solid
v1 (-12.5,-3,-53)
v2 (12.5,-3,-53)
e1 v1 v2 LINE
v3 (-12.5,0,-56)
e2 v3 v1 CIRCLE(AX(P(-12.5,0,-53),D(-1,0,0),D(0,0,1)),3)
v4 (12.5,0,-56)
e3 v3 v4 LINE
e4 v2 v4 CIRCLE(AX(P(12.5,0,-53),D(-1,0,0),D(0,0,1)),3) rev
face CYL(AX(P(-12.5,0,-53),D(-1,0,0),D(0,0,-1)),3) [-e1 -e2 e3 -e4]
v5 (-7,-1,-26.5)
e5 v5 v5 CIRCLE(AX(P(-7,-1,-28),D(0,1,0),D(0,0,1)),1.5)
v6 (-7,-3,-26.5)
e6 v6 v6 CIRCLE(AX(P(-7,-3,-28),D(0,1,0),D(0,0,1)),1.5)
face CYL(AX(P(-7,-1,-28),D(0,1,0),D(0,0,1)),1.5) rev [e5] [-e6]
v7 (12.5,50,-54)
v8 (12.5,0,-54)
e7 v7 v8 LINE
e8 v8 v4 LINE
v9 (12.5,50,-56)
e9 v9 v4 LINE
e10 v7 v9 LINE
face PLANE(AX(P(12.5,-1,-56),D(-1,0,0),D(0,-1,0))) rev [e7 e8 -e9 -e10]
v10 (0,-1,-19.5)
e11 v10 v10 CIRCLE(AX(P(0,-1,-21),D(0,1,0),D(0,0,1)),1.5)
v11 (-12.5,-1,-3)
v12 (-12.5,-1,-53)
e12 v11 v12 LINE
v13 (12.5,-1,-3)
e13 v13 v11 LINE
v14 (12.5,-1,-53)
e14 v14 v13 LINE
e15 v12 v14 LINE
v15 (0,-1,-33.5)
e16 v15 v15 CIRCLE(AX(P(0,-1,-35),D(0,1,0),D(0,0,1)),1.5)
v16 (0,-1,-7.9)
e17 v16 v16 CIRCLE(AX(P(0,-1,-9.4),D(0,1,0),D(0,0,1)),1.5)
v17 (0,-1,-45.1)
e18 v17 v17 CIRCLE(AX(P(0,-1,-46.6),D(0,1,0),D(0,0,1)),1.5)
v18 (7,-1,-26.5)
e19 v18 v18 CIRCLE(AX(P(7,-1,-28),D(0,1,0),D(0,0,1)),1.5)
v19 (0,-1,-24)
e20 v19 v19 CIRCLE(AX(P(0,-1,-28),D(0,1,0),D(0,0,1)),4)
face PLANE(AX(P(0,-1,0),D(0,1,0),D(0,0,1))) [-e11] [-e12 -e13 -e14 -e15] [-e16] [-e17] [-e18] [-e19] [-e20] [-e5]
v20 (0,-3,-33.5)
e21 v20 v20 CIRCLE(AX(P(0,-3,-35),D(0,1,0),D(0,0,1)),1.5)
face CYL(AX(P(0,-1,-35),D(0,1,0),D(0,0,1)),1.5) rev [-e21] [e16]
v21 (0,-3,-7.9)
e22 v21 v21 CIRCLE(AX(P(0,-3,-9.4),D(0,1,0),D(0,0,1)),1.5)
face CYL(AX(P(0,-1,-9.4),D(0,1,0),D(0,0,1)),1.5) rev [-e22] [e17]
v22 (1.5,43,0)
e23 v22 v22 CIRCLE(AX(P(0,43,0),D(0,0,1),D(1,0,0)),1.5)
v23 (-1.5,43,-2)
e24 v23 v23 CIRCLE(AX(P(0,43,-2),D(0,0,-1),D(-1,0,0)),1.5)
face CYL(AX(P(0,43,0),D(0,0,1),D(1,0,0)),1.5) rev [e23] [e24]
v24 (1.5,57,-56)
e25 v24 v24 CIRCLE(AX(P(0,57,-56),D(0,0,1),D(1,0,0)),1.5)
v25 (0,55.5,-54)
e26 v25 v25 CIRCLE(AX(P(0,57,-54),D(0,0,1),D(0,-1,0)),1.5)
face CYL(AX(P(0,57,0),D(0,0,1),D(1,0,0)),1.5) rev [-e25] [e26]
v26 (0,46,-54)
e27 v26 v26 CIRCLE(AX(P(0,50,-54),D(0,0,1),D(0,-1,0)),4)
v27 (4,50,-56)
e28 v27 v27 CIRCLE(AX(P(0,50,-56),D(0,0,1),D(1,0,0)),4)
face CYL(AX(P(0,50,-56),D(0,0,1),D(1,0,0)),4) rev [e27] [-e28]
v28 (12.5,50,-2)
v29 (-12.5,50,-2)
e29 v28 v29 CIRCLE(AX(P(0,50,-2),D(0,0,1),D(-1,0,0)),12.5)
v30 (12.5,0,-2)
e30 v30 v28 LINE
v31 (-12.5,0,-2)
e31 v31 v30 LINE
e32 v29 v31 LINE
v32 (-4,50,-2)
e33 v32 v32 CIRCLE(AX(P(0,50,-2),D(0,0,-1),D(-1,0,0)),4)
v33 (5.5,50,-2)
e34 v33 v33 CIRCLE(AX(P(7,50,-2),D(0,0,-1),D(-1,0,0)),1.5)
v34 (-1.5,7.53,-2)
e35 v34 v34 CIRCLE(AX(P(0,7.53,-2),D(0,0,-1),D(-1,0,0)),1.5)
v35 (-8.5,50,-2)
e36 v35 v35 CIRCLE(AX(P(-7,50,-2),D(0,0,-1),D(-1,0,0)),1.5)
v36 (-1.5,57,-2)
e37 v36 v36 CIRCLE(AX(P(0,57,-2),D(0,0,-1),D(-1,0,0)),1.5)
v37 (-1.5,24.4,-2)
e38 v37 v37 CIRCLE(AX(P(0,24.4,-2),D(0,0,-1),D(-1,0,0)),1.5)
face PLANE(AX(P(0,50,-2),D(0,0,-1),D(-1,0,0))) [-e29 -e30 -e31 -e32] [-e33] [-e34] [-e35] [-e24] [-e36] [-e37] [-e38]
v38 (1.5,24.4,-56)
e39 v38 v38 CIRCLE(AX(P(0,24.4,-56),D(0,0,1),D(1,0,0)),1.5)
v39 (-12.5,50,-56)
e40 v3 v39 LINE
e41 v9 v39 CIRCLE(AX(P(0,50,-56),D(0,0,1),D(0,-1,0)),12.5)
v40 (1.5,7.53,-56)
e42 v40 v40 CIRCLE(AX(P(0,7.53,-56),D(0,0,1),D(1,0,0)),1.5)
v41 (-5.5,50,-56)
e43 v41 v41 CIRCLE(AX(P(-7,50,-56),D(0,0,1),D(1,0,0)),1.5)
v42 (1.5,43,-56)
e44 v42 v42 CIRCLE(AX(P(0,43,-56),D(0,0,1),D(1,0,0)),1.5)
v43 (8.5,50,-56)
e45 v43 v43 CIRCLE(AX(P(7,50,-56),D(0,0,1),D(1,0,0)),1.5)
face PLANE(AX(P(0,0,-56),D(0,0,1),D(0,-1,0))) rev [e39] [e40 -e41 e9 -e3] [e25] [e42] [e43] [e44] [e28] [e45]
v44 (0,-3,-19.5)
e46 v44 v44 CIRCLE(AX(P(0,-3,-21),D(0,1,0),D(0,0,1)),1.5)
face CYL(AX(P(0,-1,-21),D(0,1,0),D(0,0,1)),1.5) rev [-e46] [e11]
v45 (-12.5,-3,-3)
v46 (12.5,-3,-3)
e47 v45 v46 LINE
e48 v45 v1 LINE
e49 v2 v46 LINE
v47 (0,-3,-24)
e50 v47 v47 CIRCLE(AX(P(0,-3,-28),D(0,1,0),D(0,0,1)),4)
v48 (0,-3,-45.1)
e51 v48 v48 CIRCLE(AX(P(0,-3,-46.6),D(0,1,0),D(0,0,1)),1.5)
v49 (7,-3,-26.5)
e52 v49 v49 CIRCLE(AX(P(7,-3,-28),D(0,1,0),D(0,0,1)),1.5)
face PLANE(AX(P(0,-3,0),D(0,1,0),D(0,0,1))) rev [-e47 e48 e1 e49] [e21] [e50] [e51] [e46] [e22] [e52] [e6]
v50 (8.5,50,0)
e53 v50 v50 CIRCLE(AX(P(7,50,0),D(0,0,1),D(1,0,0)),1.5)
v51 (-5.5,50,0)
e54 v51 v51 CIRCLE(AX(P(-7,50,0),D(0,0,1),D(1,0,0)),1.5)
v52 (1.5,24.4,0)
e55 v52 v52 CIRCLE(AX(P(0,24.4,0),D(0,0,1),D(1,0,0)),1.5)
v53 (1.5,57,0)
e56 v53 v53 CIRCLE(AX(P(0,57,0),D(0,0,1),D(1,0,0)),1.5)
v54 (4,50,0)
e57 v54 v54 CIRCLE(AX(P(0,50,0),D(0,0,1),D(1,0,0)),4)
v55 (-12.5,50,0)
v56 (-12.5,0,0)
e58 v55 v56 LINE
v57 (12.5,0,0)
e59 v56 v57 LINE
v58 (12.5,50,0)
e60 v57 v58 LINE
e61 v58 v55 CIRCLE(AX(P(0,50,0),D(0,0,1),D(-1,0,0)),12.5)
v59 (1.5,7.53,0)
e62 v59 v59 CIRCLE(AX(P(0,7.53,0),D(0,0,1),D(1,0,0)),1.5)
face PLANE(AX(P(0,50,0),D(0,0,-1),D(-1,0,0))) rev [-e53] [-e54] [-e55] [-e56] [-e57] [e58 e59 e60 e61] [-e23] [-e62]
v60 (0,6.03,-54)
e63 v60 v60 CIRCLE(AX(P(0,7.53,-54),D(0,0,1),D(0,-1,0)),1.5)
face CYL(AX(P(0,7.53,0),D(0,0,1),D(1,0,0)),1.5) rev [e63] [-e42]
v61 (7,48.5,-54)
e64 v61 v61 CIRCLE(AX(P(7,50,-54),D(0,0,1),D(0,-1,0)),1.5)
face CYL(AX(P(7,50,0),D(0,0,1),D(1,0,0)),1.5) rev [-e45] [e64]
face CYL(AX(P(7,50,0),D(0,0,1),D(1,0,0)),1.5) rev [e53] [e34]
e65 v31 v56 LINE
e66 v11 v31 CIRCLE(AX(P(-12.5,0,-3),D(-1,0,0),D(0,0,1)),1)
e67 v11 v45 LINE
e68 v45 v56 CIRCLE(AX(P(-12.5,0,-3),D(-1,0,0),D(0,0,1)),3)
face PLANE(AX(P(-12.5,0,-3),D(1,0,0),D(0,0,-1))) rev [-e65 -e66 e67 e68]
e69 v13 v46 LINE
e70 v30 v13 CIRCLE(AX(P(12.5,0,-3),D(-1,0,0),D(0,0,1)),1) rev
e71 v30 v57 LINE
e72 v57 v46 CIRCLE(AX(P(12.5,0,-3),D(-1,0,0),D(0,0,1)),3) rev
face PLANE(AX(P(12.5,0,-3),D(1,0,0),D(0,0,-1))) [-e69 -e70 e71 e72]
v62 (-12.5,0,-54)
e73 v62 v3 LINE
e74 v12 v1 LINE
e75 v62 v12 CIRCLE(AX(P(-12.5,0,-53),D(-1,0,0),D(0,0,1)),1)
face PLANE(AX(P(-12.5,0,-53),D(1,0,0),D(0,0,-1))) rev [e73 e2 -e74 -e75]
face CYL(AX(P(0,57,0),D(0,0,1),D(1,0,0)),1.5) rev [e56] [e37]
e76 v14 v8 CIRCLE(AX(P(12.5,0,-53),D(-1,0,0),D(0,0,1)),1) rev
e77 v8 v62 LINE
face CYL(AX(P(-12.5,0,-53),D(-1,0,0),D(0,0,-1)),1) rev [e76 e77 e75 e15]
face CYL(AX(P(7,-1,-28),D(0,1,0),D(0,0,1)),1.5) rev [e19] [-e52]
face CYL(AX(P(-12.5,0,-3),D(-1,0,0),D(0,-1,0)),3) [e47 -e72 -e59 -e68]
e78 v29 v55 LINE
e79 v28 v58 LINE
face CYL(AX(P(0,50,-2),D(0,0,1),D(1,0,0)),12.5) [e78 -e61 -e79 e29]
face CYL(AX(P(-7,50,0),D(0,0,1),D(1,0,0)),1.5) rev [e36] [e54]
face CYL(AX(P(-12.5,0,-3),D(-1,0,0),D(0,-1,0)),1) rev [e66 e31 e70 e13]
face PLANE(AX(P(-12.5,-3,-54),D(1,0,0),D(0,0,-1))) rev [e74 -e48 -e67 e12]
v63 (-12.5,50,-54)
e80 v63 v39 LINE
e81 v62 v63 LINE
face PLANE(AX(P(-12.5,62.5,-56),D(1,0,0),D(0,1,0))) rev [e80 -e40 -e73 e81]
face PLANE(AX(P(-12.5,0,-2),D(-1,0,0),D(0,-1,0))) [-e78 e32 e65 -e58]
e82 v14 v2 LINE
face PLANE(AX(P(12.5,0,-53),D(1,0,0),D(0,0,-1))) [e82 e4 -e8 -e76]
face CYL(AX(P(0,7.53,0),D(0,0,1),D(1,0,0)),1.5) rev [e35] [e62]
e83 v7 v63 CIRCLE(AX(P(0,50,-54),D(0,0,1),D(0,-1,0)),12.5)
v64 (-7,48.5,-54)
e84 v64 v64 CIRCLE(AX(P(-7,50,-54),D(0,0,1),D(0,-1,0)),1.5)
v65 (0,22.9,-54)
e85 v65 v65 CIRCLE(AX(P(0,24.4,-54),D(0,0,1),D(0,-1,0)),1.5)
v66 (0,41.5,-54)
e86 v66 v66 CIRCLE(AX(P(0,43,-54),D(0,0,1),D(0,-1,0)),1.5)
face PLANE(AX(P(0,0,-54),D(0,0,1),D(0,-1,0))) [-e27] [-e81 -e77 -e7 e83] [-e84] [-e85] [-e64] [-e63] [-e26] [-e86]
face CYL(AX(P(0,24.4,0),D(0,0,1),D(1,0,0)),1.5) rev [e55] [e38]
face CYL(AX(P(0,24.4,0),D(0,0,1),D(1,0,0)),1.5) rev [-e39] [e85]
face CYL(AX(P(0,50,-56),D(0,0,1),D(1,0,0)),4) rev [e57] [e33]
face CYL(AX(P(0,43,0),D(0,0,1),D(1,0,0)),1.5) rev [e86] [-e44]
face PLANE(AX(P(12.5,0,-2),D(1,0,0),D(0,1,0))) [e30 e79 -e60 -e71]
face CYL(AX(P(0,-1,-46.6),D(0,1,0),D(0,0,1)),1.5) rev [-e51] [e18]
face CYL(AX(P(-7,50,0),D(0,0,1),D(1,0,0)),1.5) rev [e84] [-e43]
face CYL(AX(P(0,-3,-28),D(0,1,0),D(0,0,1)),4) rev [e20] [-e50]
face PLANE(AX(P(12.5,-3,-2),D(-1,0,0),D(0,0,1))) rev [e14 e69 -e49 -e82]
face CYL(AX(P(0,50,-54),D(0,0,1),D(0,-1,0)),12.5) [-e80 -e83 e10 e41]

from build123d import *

# Parameters (mm, degrees)
BASE_FLANGE1_DEPTH           = 2
EDGE_FLANGE1_DEPTH           = 25
EDGE_FLANGE2_STRIP_W         = 10
EDGE_FLANGE2_STRIP_H         = 2
EDGE_FLANGE2_STRIP_CUT_DEPTH = 25
EDGE_FLANGE2_DEPTH           = 25
CUT_EXTRUDE1_START           = -2
CUT_EXTRUDE1_DEPTH           = 2
SKETCH19_R                   = 4
CUT_EXTRUDE2_DEPTH           = 85.843974447
M3X0_5_TAPPED_HOLE1_D        = 3
SKETCH22_R                   = 4
CUT_EXTRUDE3_DEPTH           = 86.583292762
M3X0_5_TAPPED_HOLE2_D        = 3


# Sheet-metal steps are written as plain solids
with BuildPart() as part:
    # Sketch8 → Base-Flange1 (new body)
    with BuildSketch(Plane.XY):
        with BuildLine():
            Line((-12.5, 0), (12.5, 0))
            Line((12.5, 0), (12.5, 50))
            ThreePointArc((12.5, 50), (0, 62.5), (-12.5, 50))
            Line((-12.5, 50), (-12.5, 0))
        make_face()
    extrude(amount=-BASE_FLANGE1_DEPTH)

    # Edge-Flange1 section (across the edge) → Edge-Flange1 (add)
    with BuildSketch(Plane(origin=(12.5, -1, -2), x_dir=(0, 1, 0), z_dir=(-1, 0, 0))):
        with BuildLine():
            Line((-2, 1), (-2, 52))
            Line((-2, 52), (0, 52))
            Line((0, 52), (0, 1))
            ThreePointArc((0, 1), (0.292893219, 0.292893219), (1, 0))
            Line((1, 0), (1, -2))
            ThreePointArc((1, -2), (-1.121320344, -1.121320344), (-2, 1))
        make_face()
    extrude(amount=EDGE_FLANGE1_DEPTH)

    # Edge-Flange2 strip (across the edge) → Edge-Flange2 strip cut (cut)
    with BuildSketch(Plane(origin=(12.5, -1, -54), x_dir=(0, 0, 1), z_dir=(-1, 0, 0))):
        with Locations((-4, -1)):
            Rectangle(EDGE_FLANGE2_STRIP_W, EDGE_FLANGE2_STRIP_H)
    extrude(amount=EDGE_FLANGE2_STRIP_CUT_DEPTH, mode=Mode.SUBTRACT)

    # Edge-Flange2 section (across the edge) → Edge-Flange2 (add)
    with BuildSketch(Plane(origin=(12.5, -1, -54), x_dir=(0, 0, 1), z_dir=(-1, 0, 0))):
        with BuildLine():
            Line((-2, 1), (-2, 63.5))
            Line((-2, 63.5), (0, 63.5))
            Line((0, 63.5), (0, 1))
            ThreePointArc((0, 1), (0.292893219, 0.292893219), (1, 0))
            Line((1, 0), (1, -2))
            ThreePointArc((1, -2), (-1.121320344, -1.121320344), (-2, 1))
        make_face()
    extrude(amount=EDGE_FLANGE2_DEPTH)

    # Sketch18 → Cut-Extrude1 (cut)
    with BuildSketch(Plane(origin=(0, 0, -56), x_dir=(-1, 0, 0), z_dir=(0, 0, -1)).offset(CUT_EXTRUDE1_START)):
        with BuildLine():
            ThreePointArc((0, 62.5), (8.838834765, 58.838834765), (12.5, 50))
            Line((12.5, 50), (12.5, 62.5))
            Line((12.5, 62.5), (0, 62.5))
        make_face()
        with BuildLine():
            ThreePointArc((-12.5, 50), (-8.838834765, 58.838834765), (0, 62.5))
            Line((0, 62.5), (-12.5, 62.5))
            Line((-12.5, 62.5), (-12.5, 50))
        make_face()
    extrude(amount=CUT_EXTRUDE1_DEPTH, mode=Mode.SUBTRACT)

    # Sketch19 → Cut-Extrude2 (cut, through all)
    with BuildSketch(Plane.XY):
        with Locations((0, 50)):
            Circle(SKETCH19_R)
    extrude(amount=-CUT_EXTRUDE2_DEPTH, mode=Mode.SUBTRACT)

    # M3x0.5 Tapped Hole1 (through all)
    with Locations(Plane.XY):
        with Locations((0, 57), (-7, 50), (0, 43), (7, 50), (0, 24.4), (0, 7.53)):
            Hole(M3X0_5_TAPPED_HOLE1_D / 2)

    # Sketch22 → Cut-Extrude3 (cut, through all)
    with BuildSketch(Plane(origin=(0, -1, 0), x_dir=(1, 0, 0), z_dir=(0, 1, 0))):
        with Locations(Location((0, 28, 0), (0, 0, 270))):
            Circle(SKETCH22_R)
    extrude(amount=-CUT_EXTRUDE3_DEPTH, mode=Mode.SUBTRACT)

    # M3x0.5 Tapped Hole2 (through all)
    with Locations(Plane(origin=(0, -1, 0), x_dir=(1, 0, 0), z_dir=(0, 1, 0))):
        with Locations((7, 28), (-7, 28), (0, 35), (0, 21), (0, 9.4), (0, 46.6)):
            Hole(M3X0_5_TAPPED_HOLE2_D / 2)


solid = part.part
